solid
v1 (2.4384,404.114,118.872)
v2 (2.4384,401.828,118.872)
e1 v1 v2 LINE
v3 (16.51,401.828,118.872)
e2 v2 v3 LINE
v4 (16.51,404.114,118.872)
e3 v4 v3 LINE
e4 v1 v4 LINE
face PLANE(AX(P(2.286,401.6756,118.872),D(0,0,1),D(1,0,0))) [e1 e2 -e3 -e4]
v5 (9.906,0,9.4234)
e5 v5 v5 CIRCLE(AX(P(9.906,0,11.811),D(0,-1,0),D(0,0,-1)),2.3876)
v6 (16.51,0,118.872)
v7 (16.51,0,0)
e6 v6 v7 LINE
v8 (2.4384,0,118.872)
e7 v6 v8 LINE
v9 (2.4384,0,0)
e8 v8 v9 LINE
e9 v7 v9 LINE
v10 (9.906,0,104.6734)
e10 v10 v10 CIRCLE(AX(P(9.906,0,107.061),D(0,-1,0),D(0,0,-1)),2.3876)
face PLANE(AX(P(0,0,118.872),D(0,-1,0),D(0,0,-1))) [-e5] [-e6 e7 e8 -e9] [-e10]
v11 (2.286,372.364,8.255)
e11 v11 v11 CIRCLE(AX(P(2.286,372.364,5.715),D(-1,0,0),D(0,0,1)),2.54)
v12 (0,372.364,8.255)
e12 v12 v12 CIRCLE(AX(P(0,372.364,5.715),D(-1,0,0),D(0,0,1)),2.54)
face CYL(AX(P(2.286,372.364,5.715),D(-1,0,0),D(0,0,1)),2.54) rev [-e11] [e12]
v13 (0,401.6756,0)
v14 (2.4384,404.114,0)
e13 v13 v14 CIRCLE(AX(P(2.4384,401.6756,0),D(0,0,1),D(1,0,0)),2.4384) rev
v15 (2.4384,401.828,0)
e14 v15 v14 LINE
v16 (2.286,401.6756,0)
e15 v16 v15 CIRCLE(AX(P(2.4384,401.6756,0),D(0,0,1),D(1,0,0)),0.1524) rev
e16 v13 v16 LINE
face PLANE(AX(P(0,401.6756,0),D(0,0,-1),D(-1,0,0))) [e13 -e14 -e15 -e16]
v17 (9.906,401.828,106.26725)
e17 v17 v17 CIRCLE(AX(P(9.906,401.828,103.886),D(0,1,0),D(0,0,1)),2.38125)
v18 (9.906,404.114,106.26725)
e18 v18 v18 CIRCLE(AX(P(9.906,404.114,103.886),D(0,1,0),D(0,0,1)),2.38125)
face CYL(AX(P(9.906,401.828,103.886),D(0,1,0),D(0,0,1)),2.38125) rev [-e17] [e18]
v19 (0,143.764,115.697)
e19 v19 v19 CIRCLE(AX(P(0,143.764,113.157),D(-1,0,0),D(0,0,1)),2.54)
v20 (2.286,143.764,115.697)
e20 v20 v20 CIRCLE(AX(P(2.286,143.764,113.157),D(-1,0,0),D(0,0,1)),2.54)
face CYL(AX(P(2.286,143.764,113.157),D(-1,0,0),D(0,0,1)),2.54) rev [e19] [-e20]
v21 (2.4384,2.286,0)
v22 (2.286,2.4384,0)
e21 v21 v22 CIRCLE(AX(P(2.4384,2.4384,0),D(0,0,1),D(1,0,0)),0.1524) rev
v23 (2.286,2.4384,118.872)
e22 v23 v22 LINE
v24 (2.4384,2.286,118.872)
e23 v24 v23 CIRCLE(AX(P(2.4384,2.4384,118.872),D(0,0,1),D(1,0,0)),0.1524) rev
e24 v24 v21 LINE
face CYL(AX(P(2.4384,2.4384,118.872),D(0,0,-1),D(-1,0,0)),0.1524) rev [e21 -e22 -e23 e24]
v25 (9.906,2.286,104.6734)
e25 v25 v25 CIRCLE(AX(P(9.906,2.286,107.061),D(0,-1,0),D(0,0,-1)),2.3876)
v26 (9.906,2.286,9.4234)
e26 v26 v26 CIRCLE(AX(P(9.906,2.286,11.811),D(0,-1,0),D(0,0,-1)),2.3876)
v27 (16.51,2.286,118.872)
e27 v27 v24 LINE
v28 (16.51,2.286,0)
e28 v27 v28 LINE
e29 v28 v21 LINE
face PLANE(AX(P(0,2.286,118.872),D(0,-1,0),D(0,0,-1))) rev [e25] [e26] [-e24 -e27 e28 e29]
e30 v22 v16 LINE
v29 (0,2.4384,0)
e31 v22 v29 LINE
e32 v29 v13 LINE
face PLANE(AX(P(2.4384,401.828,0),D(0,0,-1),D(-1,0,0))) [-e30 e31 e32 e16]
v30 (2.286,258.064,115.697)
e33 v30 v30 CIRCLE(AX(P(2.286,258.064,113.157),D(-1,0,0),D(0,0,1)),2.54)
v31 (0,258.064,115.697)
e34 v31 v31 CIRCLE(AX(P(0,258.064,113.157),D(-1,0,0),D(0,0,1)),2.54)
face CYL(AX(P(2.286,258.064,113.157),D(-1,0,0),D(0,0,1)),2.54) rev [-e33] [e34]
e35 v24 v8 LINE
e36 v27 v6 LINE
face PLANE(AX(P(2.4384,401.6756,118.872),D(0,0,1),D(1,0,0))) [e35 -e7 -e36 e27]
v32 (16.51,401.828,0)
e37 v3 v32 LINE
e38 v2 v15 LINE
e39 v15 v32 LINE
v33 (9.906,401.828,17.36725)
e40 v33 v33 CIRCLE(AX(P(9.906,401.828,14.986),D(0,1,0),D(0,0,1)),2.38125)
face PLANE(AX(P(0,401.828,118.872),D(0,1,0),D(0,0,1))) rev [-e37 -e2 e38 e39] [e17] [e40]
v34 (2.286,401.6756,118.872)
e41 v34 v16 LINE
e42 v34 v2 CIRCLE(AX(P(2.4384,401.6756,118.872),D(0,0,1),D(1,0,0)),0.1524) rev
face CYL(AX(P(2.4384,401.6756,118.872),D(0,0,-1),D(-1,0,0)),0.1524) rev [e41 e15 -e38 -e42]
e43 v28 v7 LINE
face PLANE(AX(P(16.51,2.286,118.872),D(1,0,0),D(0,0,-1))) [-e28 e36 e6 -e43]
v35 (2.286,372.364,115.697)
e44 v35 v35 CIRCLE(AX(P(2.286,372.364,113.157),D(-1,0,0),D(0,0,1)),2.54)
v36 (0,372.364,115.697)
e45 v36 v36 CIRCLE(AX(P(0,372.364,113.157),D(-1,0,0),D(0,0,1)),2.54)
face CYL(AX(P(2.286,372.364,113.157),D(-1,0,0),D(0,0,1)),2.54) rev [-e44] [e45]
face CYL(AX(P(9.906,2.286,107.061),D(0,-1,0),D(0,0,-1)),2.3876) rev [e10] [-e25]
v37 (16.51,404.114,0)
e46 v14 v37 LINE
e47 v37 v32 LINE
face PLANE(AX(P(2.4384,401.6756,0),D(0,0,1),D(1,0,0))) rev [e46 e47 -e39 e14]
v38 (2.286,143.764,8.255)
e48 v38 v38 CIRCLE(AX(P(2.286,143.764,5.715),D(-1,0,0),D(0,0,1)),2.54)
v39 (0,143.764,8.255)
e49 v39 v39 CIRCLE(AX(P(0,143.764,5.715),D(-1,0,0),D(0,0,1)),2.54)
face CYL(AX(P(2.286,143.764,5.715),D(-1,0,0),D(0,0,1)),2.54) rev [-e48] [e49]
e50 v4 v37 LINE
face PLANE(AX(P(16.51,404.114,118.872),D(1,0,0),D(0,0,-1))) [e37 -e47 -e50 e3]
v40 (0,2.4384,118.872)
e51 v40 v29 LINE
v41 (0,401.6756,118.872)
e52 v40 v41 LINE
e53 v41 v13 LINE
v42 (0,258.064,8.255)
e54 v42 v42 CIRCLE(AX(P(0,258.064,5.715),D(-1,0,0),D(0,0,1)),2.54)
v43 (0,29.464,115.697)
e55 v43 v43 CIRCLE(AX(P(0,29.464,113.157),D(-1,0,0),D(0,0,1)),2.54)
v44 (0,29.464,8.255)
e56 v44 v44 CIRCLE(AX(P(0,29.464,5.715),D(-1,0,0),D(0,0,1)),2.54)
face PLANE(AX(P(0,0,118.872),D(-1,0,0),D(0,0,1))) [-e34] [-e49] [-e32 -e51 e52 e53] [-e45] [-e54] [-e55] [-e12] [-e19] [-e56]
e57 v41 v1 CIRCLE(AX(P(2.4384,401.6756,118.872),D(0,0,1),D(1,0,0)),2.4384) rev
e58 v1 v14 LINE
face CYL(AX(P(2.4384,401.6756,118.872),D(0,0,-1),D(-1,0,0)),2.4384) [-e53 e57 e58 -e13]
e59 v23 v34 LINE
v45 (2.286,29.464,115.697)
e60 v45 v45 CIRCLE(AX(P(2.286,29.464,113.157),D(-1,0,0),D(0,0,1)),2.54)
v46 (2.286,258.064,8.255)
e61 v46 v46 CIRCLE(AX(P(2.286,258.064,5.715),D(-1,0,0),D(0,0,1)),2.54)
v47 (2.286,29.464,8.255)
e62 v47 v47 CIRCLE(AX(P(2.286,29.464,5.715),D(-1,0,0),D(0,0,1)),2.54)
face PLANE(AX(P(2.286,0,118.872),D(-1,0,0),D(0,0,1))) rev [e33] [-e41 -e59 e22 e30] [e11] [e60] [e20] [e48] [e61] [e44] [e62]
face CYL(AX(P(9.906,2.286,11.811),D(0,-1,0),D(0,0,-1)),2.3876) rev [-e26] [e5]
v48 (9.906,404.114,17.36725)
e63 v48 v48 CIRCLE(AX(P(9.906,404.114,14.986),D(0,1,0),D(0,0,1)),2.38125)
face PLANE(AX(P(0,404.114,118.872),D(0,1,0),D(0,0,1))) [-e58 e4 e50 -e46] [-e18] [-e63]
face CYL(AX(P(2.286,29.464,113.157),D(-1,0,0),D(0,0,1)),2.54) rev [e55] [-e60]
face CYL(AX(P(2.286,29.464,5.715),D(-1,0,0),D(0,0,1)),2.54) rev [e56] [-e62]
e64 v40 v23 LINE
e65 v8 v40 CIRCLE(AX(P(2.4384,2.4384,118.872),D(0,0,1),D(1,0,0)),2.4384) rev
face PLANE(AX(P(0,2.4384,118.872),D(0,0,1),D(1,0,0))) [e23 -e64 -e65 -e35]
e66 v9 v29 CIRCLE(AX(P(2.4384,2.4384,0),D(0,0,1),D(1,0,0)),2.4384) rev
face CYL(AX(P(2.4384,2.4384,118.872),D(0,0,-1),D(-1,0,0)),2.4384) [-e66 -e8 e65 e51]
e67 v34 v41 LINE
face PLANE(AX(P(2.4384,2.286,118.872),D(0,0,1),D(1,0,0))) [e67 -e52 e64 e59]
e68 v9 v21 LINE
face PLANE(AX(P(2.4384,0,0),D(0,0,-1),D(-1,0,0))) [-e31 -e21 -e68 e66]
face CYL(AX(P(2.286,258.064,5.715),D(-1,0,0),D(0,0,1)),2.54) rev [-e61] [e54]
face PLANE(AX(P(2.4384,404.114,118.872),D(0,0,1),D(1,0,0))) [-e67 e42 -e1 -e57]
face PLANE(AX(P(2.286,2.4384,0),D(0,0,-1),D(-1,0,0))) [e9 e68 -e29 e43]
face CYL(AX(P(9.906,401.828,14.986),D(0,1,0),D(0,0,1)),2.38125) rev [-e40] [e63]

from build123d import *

# Parameters (mm, degrees)
BASE_FLANGE2_DEPTH = 118.872
SKETCH3_R          = 2.54
CUT_EXTRUDE1_DEPTH = 2.286
SKETCH4_R          = 2.3876
CUT_EXTRUDE3_DEPTH = 2.286
SKETCH7_R          = 2.38125
CUT_EXTRUDE4_DEPTH = 2.286


# Sheet-metal steps are written as plain solids
with BuildPart() as part:
    # Sketch2 → Base-Flange2 (new body)
    with BuildSketch(Plane.XY):
        with BuildLine():
            Line((16.51, 404.114), (2.4384, 404.114))
            ThreePointArc((2.4384, 404.114), (0.714190825, 403.399809175), (0, 401.6756))
            Line((0, 401.6756), (0, 2.4384))
            ThreePointArc((0, 2.4384), (0.714190825, 0.714190825), (2.4384, 0))
            Line((2.4384, 0), (16.51, 0))
            Line((16.51, 0), (16.51, 2.286))
            Line((16.51, 2.286), (2.4384, 2.286))
            ThreePointArc((2.4384, 2.286), (2.330636927, 2.330636927), (2.286, 2.4384))
            Line((2.286, 2.4384), (2.286, 401.6756))
            ThreePointArc((2.286, 401.6756), (2.330636927, 401.783363073), (2.4384, 401.828))
            Line((2.4384, 401.828), (16.51, 401.828))
            Line((16.51, 401.828), (16.51, 404.114))
        make_face()
    extrude(amount=BASE_FLANGE2_DEPTH)

    # Sketch3 → Cut-Extrude1 (cut)
    with BuildSketch(Plane.ZY):
        with Locations((5.715, 258.064)):
            Circle(SKETCH3_R)
        with Locations((113.157, 258.064)):
            Circle(SKETCH3_R)
        with Locations((5.715, 143.764)):
            Circle(SKETCH3_R)
        with Locations((113.157, 143.764)):
            Circle(SKETCH3_R)
        with Locations((5.715, 372.364)):
            Circle(SKETCH3_R)
        with Locations((113.157, 372.364)):
            Circle(SKETCH3_R)
        with Locations((113.157, 29.464)):
            Circle(SKETCH3_R)
        with Locations((5.715, 29.464)):
            Circle(SKETCH3_R)
    extrude(amount=-CUT_EXTRUDE1_DEPTH, mode=Mode.SUBTRACT)

    # Sketch4 → Cut-Extrude3 (cut)
    with BuildSketch(Plane.XZ):
        with Locations(Location((9.906, 107.061, 0), (0, 0, 270))):
            Circle(SKETCH4_R)
        with Locations(Location((9.906, 11.811, 0), (0, 0, 270))):
            Circle(SKETCH4_R)
    extrude(amount=-CUT_EXTRUDE3_DEPTH, mode=Mode.SUBTRACT)

    # Sketch7 → Cut-Extrude4 (cut)
    with BuildSketch(Plane(origin=(0, 404.114, 0), x_dir=(-1, 0, 0), z_dir=(0, 1, 0))):
        with Locations(Location((-9.906, 103.886, 0), (0, 0, 90))):
            Circle(SKETCH7_R)
        with Locations(Location((-9.906, 14.986, 0), (0, 0, 90))):
            Circle(SKETCH7_R)
    extrude(amount=-CUT_EXTRUDE4_DEPTH, mode=Mode.SUBTRACT)


solid = part.part
